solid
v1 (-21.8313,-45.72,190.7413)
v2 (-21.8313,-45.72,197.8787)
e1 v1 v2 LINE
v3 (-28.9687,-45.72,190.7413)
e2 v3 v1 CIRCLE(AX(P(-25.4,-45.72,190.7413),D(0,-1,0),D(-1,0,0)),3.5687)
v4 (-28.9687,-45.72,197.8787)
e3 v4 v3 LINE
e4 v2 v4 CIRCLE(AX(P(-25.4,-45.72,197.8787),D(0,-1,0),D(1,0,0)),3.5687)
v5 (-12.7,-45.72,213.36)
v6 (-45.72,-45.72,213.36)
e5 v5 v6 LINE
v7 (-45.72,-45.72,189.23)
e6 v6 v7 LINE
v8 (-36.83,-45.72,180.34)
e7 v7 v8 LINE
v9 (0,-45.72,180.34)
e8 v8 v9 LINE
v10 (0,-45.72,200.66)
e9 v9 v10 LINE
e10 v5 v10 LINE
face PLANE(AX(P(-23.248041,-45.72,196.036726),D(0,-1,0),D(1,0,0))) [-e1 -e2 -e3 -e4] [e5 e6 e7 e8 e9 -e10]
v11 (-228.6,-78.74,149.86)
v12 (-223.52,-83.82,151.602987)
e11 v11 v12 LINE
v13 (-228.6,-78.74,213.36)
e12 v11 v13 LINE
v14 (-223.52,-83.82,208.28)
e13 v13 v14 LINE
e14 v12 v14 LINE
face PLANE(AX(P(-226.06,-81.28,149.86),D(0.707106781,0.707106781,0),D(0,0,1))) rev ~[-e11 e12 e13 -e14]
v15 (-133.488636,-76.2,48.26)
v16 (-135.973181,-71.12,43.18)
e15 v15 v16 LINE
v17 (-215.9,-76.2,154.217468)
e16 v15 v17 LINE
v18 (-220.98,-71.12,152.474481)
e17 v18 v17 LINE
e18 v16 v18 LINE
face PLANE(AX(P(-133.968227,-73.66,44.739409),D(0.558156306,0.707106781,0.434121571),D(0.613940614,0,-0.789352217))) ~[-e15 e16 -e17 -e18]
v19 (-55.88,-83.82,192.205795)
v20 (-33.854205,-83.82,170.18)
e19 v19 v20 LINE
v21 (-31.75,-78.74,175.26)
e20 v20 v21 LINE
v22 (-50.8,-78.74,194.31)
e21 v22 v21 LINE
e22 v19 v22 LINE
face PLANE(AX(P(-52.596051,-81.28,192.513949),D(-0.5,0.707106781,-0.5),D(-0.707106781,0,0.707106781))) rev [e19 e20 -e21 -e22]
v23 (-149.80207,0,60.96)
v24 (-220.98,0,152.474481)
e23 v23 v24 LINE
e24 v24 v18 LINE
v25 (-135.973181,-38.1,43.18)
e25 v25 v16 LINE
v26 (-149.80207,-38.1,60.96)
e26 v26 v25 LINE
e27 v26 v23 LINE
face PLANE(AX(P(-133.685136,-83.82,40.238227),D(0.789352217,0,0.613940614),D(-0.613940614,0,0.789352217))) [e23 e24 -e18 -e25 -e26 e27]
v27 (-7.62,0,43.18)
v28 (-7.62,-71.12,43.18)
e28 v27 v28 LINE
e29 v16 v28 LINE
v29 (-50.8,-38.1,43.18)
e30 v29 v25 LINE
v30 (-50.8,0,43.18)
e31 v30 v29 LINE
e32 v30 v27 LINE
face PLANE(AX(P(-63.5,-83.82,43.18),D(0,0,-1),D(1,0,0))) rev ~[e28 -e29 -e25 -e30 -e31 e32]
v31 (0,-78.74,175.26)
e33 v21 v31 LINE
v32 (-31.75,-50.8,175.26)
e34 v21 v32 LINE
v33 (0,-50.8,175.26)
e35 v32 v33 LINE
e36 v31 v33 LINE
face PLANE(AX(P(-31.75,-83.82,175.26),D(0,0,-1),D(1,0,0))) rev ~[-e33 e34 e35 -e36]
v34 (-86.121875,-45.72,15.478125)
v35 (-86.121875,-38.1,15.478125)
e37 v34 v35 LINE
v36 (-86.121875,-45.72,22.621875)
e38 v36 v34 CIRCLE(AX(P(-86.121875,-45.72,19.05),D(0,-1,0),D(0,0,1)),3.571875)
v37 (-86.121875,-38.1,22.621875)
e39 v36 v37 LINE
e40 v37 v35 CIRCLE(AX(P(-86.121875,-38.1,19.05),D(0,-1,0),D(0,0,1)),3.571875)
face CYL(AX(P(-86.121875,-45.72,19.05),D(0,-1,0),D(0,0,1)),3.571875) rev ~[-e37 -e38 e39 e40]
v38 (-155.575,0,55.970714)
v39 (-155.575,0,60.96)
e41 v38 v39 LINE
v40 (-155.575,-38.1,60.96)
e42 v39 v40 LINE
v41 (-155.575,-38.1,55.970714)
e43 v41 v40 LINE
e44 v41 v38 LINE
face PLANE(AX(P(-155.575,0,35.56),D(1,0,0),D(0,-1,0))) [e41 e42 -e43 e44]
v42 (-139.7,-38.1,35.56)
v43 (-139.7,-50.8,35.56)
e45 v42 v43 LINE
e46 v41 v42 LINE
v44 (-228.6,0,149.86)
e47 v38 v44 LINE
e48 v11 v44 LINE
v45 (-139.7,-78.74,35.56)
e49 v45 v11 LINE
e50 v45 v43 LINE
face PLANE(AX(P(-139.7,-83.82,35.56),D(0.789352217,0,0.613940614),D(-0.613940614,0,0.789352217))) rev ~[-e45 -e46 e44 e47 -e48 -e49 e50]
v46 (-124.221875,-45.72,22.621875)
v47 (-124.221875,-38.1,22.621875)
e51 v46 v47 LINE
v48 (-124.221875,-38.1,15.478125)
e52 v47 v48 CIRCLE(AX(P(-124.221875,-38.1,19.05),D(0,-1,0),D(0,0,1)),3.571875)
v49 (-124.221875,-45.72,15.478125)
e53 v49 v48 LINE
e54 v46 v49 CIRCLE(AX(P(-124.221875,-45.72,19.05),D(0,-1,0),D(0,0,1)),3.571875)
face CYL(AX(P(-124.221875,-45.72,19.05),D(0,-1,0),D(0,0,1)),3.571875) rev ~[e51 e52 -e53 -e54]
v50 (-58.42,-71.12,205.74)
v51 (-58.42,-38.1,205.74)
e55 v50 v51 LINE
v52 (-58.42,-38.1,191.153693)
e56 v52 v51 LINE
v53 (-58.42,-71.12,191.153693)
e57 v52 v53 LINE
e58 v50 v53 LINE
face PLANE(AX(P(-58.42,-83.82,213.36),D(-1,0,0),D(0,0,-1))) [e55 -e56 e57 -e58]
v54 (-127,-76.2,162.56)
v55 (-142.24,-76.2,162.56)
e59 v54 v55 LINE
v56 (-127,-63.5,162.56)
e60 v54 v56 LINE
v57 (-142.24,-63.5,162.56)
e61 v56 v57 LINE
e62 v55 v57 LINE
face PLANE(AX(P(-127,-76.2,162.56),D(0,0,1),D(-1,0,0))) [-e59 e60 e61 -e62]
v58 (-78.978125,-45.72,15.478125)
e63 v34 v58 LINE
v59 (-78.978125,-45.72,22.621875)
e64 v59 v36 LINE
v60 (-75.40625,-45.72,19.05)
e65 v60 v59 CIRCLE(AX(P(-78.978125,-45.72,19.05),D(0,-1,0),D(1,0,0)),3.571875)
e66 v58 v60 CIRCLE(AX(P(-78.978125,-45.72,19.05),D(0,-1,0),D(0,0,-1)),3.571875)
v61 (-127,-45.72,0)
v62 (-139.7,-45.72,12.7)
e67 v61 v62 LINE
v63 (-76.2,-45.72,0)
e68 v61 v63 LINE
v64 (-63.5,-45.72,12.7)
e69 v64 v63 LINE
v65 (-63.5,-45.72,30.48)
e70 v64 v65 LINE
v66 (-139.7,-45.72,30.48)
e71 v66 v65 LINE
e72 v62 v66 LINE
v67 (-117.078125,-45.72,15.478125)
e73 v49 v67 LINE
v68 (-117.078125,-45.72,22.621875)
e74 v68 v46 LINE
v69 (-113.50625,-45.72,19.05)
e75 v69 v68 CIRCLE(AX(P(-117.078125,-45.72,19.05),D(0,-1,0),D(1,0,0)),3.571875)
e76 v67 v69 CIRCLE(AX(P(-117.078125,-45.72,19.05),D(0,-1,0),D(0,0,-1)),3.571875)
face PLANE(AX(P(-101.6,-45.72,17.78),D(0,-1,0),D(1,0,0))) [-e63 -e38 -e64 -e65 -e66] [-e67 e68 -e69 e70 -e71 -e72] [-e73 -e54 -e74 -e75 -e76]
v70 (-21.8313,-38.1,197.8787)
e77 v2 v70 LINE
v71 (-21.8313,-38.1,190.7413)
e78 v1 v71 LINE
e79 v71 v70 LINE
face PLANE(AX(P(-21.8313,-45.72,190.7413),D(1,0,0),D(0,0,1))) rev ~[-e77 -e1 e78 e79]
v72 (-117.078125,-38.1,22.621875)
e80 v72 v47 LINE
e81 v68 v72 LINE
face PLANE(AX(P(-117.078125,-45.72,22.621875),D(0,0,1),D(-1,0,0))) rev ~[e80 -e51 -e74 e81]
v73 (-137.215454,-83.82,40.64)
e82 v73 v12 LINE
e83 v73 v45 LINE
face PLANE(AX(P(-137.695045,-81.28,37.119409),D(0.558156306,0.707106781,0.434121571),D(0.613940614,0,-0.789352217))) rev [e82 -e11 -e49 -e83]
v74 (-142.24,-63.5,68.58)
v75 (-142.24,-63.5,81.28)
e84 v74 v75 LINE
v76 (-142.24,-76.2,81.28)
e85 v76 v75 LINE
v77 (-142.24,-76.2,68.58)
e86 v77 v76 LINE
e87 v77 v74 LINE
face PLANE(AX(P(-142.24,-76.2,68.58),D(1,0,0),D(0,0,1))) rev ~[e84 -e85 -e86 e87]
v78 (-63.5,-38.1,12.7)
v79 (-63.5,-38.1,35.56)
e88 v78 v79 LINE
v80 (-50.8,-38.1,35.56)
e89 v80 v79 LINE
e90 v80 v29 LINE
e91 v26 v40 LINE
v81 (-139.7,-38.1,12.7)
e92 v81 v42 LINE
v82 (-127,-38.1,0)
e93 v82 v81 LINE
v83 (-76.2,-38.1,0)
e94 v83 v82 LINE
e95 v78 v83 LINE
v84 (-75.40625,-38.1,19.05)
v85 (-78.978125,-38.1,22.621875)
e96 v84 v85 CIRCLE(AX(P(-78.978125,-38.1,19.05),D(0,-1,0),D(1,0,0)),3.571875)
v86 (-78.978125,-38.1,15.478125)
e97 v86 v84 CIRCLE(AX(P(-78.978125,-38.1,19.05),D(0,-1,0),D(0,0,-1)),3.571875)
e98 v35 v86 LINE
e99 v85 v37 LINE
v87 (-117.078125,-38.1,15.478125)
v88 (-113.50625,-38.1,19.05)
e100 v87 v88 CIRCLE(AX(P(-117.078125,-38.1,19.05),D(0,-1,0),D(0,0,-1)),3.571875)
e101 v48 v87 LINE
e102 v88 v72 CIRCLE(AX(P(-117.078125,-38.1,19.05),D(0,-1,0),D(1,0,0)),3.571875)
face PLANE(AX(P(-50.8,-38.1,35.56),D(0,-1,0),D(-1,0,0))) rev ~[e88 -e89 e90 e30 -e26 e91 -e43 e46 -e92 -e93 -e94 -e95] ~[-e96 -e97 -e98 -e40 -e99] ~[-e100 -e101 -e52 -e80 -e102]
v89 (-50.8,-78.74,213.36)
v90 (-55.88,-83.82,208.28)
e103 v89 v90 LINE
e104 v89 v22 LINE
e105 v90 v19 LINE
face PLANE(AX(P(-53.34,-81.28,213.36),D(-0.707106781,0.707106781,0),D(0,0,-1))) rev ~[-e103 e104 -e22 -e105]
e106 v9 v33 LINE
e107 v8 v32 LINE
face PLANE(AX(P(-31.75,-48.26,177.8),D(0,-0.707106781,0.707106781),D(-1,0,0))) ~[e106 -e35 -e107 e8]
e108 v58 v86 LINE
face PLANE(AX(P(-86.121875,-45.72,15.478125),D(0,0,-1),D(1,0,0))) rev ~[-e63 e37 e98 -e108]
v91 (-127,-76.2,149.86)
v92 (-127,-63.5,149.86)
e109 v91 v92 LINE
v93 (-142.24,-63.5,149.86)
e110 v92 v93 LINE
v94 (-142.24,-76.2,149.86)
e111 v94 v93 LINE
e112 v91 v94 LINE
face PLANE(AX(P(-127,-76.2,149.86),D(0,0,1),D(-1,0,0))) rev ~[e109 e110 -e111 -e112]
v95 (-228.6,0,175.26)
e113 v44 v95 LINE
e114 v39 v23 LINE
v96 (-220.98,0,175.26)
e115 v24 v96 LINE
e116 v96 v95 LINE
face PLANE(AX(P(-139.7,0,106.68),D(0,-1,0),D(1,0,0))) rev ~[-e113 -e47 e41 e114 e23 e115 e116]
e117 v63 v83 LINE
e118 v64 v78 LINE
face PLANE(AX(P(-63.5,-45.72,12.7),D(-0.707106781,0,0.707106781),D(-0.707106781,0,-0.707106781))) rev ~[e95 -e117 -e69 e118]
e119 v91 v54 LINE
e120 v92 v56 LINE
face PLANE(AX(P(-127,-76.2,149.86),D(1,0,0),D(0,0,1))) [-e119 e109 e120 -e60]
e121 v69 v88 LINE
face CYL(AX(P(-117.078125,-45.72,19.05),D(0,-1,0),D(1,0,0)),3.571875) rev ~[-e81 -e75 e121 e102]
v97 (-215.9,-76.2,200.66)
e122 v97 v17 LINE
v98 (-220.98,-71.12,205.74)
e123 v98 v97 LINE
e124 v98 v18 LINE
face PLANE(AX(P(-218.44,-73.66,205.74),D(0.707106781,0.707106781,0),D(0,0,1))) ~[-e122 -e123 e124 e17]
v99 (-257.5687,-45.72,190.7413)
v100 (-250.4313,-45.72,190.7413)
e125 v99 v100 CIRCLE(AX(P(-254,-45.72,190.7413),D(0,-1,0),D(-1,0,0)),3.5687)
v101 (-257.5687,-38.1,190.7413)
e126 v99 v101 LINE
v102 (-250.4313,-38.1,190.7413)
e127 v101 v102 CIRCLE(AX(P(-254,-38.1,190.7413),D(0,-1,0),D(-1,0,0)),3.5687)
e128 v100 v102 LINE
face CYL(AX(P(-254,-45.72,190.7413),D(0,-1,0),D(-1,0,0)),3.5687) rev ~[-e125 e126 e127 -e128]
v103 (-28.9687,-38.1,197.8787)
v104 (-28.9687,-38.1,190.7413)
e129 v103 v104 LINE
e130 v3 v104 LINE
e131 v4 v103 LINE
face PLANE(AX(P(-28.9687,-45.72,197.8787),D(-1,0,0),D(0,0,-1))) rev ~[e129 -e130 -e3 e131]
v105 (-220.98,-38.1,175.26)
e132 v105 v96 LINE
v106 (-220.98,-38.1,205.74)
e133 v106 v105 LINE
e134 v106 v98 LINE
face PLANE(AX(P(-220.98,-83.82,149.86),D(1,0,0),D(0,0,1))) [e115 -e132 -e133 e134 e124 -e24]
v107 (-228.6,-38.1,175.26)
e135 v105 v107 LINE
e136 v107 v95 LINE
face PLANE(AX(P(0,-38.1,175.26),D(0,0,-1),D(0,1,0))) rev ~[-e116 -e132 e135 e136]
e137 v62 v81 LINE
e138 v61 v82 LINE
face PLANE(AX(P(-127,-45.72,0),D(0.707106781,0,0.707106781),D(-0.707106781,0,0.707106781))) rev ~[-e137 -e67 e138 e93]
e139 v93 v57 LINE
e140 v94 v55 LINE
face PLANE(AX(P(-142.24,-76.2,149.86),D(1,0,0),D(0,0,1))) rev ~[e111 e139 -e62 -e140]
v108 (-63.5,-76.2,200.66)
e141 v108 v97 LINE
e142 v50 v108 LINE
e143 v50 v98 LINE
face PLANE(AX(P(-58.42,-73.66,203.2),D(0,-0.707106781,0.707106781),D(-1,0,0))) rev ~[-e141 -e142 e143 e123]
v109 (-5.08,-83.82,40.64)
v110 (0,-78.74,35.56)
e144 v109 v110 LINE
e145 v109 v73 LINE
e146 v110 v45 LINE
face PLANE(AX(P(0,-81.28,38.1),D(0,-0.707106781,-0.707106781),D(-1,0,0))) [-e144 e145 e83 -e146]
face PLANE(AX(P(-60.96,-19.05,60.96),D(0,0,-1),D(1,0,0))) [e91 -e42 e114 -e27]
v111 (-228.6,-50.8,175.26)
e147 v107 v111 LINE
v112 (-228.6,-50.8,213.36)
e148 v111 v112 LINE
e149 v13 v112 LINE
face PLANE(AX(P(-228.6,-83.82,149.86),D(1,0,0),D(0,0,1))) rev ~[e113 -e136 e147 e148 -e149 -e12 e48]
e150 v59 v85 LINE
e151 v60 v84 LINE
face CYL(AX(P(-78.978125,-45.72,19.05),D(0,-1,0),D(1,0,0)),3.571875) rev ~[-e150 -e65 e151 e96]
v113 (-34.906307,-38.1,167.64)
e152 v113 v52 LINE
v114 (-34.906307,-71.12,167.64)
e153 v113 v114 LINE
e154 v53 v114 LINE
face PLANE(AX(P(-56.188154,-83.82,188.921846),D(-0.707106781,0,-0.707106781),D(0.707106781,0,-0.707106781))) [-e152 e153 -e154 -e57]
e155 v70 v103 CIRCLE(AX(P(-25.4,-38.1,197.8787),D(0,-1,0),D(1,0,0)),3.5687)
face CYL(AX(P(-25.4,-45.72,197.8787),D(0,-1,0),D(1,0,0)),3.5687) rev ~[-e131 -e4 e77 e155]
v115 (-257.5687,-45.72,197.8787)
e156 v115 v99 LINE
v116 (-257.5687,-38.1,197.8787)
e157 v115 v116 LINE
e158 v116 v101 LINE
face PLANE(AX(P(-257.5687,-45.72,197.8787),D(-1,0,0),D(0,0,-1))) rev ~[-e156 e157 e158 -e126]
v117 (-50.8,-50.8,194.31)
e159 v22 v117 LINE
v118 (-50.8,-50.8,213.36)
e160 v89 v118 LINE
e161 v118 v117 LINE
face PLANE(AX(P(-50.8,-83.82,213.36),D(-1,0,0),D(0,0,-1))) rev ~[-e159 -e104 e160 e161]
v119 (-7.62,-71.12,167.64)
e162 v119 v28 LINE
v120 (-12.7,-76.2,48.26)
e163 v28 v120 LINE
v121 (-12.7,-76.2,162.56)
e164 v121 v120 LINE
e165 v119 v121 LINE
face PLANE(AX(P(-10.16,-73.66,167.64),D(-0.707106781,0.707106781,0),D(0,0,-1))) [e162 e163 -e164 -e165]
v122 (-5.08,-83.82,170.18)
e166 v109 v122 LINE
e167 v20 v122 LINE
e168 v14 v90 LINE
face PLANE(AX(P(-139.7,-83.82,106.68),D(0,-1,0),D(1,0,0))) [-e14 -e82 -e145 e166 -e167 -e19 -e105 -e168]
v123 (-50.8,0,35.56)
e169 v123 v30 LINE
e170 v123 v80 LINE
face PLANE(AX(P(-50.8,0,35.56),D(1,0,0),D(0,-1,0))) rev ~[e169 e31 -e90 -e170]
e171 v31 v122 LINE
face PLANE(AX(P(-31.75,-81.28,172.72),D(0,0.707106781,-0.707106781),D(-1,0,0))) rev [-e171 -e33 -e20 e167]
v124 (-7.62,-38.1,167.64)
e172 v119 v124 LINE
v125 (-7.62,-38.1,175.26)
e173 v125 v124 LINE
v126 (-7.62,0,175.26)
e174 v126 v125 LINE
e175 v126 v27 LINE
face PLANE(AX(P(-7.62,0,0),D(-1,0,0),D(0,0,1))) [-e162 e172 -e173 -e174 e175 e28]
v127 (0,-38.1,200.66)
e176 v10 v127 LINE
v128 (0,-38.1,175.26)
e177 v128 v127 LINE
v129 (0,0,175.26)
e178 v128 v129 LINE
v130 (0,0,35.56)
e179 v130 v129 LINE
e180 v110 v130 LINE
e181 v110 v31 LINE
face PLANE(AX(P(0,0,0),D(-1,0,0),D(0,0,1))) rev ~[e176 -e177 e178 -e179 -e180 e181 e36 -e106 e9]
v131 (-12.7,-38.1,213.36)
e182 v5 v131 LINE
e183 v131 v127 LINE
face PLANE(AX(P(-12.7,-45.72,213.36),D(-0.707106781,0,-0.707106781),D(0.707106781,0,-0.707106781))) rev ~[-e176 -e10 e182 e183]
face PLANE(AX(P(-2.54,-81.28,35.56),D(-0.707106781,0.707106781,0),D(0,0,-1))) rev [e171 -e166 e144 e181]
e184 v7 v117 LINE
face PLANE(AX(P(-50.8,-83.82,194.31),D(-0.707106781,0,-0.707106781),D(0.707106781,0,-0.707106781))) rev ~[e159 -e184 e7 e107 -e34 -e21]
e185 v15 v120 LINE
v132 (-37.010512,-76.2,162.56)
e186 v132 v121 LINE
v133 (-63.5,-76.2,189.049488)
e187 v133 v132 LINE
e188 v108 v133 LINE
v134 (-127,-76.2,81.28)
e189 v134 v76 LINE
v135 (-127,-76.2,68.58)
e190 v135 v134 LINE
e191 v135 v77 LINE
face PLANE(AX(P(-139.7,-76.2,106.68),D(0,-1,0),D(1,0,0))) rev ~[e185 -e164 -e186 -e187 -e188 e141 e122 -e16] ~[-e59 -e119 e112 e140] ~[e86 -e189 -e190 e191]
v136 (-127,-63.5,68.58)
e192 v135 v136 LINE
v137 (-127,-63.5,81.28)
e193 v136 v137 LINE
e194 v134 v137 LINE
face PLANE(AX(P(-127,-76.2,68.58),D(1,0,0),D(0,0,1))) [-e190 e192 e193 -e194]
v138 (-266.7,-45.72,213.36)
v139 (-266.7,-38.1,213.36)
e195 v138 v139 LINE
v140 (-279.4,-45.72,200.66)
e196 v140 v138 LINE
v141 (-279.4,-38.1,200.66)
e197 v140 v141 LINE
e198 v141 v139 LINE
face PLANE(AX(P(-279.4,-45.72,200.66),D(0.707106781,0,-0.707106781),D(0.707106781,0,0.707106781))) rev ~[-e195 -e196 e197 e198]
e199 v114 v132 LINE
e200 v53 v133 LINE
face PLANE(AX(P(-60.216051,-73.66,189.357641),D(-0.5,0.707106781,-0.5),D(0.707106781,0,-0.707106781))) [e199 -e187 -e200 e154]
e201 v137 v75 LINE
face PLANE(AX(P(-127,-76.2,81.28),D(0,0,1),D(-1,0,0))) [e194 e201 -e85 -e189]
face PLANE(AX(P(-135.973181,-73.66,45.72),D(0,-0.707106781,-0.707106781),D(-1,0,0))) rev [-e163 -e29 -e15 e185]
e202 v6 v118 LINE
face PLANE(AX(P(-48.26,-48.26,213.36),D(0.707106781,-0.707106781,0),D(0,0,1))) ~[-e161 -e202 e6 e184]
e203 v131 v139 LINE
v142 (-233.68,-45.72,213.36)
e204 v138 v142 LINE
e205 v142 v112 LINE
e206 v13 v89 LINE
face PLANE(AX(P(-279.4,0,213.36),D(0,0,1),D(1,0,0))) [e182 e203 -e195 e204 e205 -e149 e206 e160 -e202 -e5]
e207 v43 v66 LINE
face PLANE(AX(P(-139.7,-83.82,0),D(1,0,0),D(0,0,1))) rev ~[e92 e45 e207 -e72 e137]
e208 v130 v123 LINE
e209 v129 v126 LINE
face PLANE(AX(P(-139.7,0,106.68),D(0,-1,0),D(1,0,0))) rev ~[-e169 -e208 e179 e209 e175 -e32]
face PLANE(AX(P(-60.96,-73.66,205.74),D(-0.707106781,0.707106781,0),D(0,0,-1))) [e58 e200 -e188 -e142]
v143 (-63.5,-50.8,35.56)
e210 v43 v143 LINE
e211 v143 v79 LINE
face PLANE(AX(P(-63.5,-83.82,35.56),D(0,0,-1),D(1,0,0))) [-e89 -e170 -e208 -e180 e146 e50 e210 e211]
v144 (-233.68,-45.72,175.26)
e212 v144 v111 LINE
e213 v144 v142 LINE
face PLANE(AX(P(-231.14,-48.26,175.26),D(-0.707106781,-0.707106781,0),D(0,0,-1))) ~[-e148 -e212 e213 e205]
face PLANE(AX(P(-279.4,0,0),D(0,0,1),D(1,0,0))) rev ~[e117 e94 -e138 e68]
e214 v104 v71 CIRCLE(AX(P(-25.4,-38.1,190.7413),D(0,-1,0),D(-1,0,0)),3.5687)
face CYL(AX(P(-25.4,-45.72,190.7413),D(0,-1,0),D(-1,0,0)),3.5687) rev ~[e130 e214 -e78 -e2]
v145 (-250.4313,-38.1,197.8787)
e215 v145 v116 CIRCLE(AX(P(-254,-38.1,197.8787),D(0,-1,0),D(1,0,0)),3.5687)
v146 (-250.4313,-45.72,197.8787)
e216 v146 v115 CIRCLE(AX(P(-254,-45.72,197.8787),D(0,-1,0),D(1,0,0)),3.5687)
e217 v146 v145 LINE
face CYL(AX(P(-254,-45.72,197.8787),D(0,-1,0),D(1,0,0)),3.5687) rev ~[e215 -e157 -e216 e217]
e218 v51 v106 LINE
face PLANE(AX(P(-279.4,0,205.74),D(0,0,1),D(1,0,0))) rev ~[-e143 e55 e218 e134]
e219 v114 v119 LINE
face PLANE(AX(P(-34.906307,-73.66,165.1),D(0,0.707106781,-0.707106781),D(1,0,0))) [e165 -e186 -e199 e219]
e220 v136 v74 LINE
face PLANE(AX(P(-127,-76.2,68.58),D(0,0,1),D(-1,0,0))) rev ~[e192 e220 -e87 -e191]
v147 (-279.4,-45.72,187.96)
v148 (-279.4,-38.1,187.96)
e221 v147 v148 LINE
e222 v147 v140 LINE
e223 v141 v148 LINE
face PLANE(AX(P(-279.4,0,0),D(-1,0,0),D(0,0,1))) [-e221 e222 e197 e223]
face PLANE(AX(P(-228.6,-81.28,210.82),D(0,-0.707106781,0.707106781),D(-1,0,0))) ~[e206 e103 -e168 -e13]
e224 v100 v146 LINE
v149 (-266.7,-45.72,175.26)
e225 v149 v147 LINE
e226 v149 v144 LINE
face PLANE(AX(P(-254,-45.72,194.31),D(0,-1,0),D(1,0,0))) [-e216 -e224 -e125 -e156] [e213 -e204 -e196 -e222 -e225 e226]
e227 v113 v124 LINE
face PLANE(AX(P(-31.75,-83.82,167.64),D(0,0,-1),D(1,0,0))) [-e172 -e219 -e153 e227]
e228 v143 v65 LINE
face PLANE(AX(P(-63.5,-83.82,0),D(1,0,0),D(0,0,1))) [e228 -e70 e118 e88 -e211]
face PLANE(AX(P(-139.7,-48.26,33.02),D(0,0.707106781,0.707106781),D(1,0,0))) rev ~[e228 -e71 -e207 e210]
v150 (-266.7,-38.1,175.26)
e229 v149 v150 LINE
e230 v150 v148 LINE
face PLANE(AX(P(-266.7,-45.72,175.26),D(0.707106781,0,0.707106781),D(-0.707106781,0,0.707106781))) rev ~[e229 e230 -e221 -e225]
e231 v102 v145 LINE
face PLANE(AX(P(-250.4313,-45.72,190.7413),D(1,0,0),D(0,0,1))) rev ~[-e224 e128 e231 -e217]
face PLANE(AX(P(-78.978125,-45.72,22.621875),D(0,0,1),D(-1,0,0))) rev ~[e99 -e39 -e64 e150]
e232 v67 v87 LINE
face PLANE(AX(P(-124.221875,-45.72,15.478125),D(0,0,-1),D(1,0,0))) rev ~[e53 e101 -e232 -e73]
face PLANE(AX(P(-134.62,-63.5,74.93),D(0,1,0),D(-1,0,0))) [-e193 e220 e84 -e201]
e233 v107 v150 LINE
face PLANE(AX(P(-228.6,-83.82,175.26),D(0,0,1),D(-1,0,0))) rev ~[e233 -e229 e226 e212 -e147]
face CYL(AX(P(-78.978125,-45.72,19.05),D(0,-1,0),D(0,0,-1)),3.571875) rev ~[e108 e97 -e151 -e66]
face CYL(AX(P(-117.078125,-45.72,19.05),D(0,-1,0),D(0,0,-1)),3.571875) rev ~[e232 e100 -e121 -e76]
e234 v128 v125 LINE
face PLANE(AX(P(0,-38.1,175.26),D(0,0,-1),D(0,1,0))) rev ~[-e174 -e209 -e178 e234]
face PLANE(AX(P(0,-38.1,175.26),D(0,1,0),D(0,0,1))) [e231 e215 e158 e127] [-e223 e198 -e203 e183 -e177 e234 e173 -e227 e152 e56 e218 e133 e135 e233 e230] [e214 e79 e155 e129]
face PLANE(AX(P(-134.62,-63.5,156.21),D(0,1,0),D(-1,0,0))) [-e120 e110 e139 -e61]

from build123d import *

# Parameters (mm, degrees)
F0_W      = 279.4
F0_H      = 213.36
F1_DEPTH  = 83.82
F2_W      = 76.2
F2_H      = 35.56
F2_W_2    = 50.8
F2_H_2    = 38.1
F3_DEPTH  = 38.1
F2_W_3    = 63.5
F4_DEPTH  = 83.82
F5_T      = -7.62
F6_W      = 38.1
F6_H      = 38.1
F6_H_2    = 35.56
F7_DEPTH  = 341.884
F9_DEPTH  = 7.62
F10_SIZE  = 5.08
F11_W     = 84.455
F11_H     = 38.1
F12_DEPTH = 25.4
F13_W     = 15.24
F13_H     = 12.7
F14_DEPTH = 12.7


# Not quite as in the source:
# - a feature names something its author has since deleted; it is built from what else it names


with BuildPart() as f1:
    # F0 (on Front) → F1 (new body)
    with BuildSketch(Plane.XZ):
        with Locations((-139.7, 106.68)):
            Rectangle(F0_W, F0_H)
    extrude(amount=F1_DEPTH)

    # F2 (on face) → F3 (cut)
    with BuildSketch(Plane.XZ.offset(83.82)):
        Polygon((0, 213.36), (-50.8, 213.36), (-50.8, 194.31), (-31.75, 175.26), (0, 175.26), align=None)
        with Locations((-101.6, 17.78)):
            Rectangle(F2_W, F2_H)
        with Locations((-254, 194.31)):
            Rectangle(F2_W_2, F2_H_2)
    extrude(amount=-F3_DEPTH, mode=Mode.SUBTRACT)

    # F2 (on face) → F4 (cut)
    with BuildSketch(Plane.XZ.offset(83.82)):
        Polygon((-228.6, 149.86), (-228.6, 175.26), (-279.4, 175.26), (-279.4, 0), (-139.7, 0), (-139.7, 35.56), align=None)
        with Locations((-31.75, 17.78)):
            Rectangle(F2_W_3, F2_H)
    extrude(amount=-F4_DEPTH, mode=Mode.SUBTRACT)

    # F5
    f5_openings = [f1.faces().sort_by_distance(p)[0] for p in [
        (-109.470638, 0, 127.051961),
    ]]
    offset(amount=F5_T, openings=f5_openings, kind=Kind.INTERSECTION)

    # F6 (on face) → F7 (cut)
    with BuildSketch(Plane.YZ):
        with Locations((-19.05, 194.31)):
            Rectangle(F6_W, F6_H)
        with Locations((-19.05, 17.78)):
            Rectangle(F6_W, F6_H_2)
    extrude(amount=-F7_DEPTH, mode=Mode.SUBTRACT)

    # F8 (on face) → F9 (cut)
    with BuildSketch(Plane.XZ.offset(45.72)):
        with BuildLine():
            ThreePointArc((-22.3094151415, 192.52565), (-21.9529005037, 193.3863524737), (-21.8313, 194.31))
            ThreePointArc((-21.8313, 194.31), (-21.9529005037, 195.2336475263), (-22.3094151415, 196.09435))
            ThreePointArc((-22.3094151415, 196.09435), (-23.61565, 194.7881151415), (-25.4, 194.31))
            ThreePointArc((-25.4, 194.31), (-23.61565, 193.8318848585), (-22.3094151415, 192.52565))
        make_face()
        with BuildLine():
            ThreePointArc((-25.4, 194.31), (-27.18435, 194.7881151415), (-28.4905848585, 196.09435))
            ThreePointArc((-28.4905848585, 196.09435), (-28.8470994963, 195.2336475263), (-28.9687, 194.31))
            ThreePointArc((-28.9687, 194.31), (-28.8470994963, 193.3863524737), (-28.4905848585, 192.52565))
            ThreePointArc((-28.4905848585, 192.52565), (-27.18435, 193.8318848585), (-25.4, 194.31))
        make_face()
        Polygon((0, 200.66), (0, 213.36), (-12.7, 213.36), align=None)
        with BuildLine():
            ThreePointArc((-250.9094151415, 192.52565), (-250.5529005037, 193.3863524737), (-250.4313, 194.31))
            ThreePointArc((-250.4313, 194.31), (-250.5529005037, 195.2336475263), (-250.9094151415, 196.09435))
            ThreePointArc((-250.9094151415, 196.09435), (-252.21565, 194.7881151415), (-254, 194.31))
            ThreePointArc((-254, 194.31), (-252.21565, 193.8318848585), (-250.9094151415, 192.52565))
        make_face()
        with BuildLine():
            ThreePointArc((-254, 194.31), (-255.78435, 194.7881151415), (-257.0905848585, 196.09435))
            ThreePointArc((-257.0905848585, 196.09435), (-257.4470994963, 195.2336475263), (-257.5687, 194.31))
            ThreePointArc((-257.5687, 194.31), (-257.4470994963, 193.3863524737), (-257.0905848585, 192.52565))
            ThreePointArc((-257.0905848585, 192.52565), (-255.78435, 193.8318848585), (-254, 194.31))
        make_face()
        Polygon((-279.4, 200.66), (-266.7, 213.36), (-279.4, 213.36), align=None)
        Polygon((-279.4, 175.26), (-266.7, 175.26), (-279.4, 187.96), align=None)
        Polygon((-127, 0), (-139.7, 12.7), (-139.7, 0), align=None)
        Polygon((-63.5, 12.7), (-76.2, 0), (-63.5, 0), align=None)
        with BuildLine():
            ThreePointArc((-82.55, 19.05), (-82.0714594891, 20.8359375), (-80.7640625, 22.1433344891))
            ThreePointArc((-80.7640625, 22.1433344891), (-81.6255307233, 22.5001663108), (-82.55, 22.621875))
            ThreePointArc((-82.55, 22.621875), (-83.4744692767, 22.5001663108), (-84.3359375, 22.1433344891))
            ThreePointArc((-84.3359375, 22.1433344891), (-83.0285405109, 20.8359375), (-82.55, 19.05))
        make_face()
        with BuildLine():
            ThreePointArc((-82.55, 15.478125), (-81.6255307233, 15.5998336892), (-80.7640625, 15.9566655109))
            ThreePointArc((-80.7640625, 15.9566655109), (-82.0714594891, 17.2640625), (-82.55, 19.05))
            ThreePointArc((-82.55, 19.05), (-83.0285405109, 17.2640625), (-84.3359375, 15.9566655109))
            ThreePointArc((-84.3359375, 15.9566655109), (-83.4744692767, 15.5998336892), (-82.55, 15.478125))
        make_face()
        with BuildLine():
            ThreePointArc((-120.65, 19.05), (-120.1714594891, 20.8359375), (-118.8640625, 22.1433344891))
            ThreePointArc((-118.8640625, 22.1433344891), (-119.7255307233, 22.5001663108), (-120.65, 22.621875))
            ThreePointArc((-120.65, 22.621875), (-121.5744692767, 22.5001663108), (-122.4359375, 22.1433344891))
            ThreePointArc((-122.4359375, 22.1433344891), (-121.1285405109, 20.8359375), (-120.65, 19.05))
        make_face()
        with BuildLine():
            ThreePointArc((-120.65, 15.478125), (-119.7255307233, 15.5998336892), (-118.8640625, 15.9566655109))
            ThreePointArc((-118.8640625, 15.9566655109), (-120.1714594891, 17.2640625), (-120.65, 19.05))
            ThreePointArc((-120.65, 19.05), (-121.1285405109, 17.2640625), (-122.4359375, 15.9566655109))
            ThreePointArc((-122.4359375, 15.9566655109), (-121.5744692767, 15.5998336892), (-120.65, 15.478125))
        make_face()
        with BuildLine():
            ThreePointArc((-28.4905848585, 196.09435), (-25.4, 197.8787), (-22.3094151415, 196.09435))
            ThreePointArc((-22.3094151415, 196.09435), (-21.9529005037, 196.9550524737), (-21.8313, 197.8787))
            ThreePointArc((-21.8313, 197.8787), (-25.4, 201.4474), (-28.9687, 197.8787))
            ThreePointArc((-28.9687, 197.8787), (-28.8470994963, 196.9550524737), (-28.4905848585, 196.09435))
        make_face()
        with BuildLine():
            ThreePointArc((-25.4, 194.31), (-23.61565, 194.7881151415), (-22.3094151415, 196.09435))
            ThreePointArc((-22.3094151415, 196.09435), (-25.4, 197.8787), (-28.4905848585, 196.09435))
            ThreePointArc((-28.4905848585, 196.09435), (-27.18435, 194.7881151415), (-25.4, 194.31))
        make_face()
        with BuildLine():
            ThreePointArc((-28.4905848585, 192.52565), (-25.4, 190.7413), (-22.3094151415, 192.52565))
            ThreePointArc((-22.3094151415, 192.52565), (-23.61565, 193.8318848585), (-25.4, 194.31))
            ThreePointArc((-25.4, 194.31), (-27.18435, 193.8318848585), (-28.4905848585, 192.52565))
        make_face()
        with BuildLine():
            ThreePointArc((-21.8313, 190.7413), (-21.9529005037, 191.6649475263), (-22.3094151415, 192.52565))
            ThreePointArc((-22.3094151415, 192.52565), (-25.4, 190.7413), (-28.4905848585, 192.52565))
            ThreePointArc((-28.4905848585, 192.52565), (-28.8470994963, 191.6649475263), (-28.9687, 190.7413))
            ThreePointArc((-28.9687, 190.7413), (-25.4, 187.1726), (-21.8313, 190.7413))
        make_face()
        with BuildLine():
            ThreePointArc((-28.9687, 194.31), (-28.8470994963, 195.2336475263), (-28.4905848585, 196.09435))
            ThreePointArc((-28.4905848585, 196.09435), (-28.8470994963, 196.9550524737), (-28.9687, 197.8787))
            Line((-28.9687, 197.8787), (-28.9687, 194.31))
        make_face()
        with BuildLine():
            ThreePointArc((-22.3094151415, 196.09435), (-21.9529005037, 195.2336475263), (-21.8313, 194.31))
            Line((-21.8313, 194.31), (-21.8313, 197.8787))
            ThreePointArc((-21.8313, 197.8787), (-21.9529005037, 196.9550524737), (-22.3094151415, 196.09435))
        make_face()
        with BuildLine():
            Line((-21.8313, 190.7413), (-21.8313, 194.31))
            ThreePointArc((-21.8313, 194.31), (-21.9529005037, 193.3863524737), (-22.3094151415, 192.52565))
            ThreePointArc((-22.3094151415, 192.52565), (-21.9529005037, 191.6649475263), (-21.8313, 190.7413))
        make_face()
        with BuildLine():
            ThreePointArc((-28.9687, 190.7413), (-28.8470994963, 191.6649475263), (-28.4905848585, 192.52565))
            ThreePointArc((-28.4905848585, 192.52565), (-28.8470994963, 193.3863524737), (-28.9687, 194.31))
            Line((-28.9687, 194.31), (-28.9687, 190.7413))
        make_face()
        with BuildLine():
            ThreePointArc((-122.4359375, 15.9566655109), (-121.1285405109, 17.2640625), (-120.65, 19.05))
            ThreePointArc((-120.65, 19.05), (-121.1285405109, 20.8359375), (-122.4359375, 22.1433344891))
            ThreePointArc((-122.4359375, 22.1433344891), (-124.221875, 19.05), (-122.4359375, 15.9566655109))
        make_face()
        with BuildLine():
            ThreePointArc((-118.8640625, 15.9566655109), (-117.5566655109, 17.2640625), (-117.078125, 19.05))
            ThreePointArc((-117.078125, 19.05), (-117.5566655109, 20.8359375), (-118.8640625, 22.1433344891))
            ThreePointArc((-118.8640625, 22.1433344891), (-120.1714594891, 20.8359375), (-120.65, 19.05))
            ThreePointArc((-120.65, 19.05), (-120.1714594891, 17.2640625), (-118.8640625, 15.9566655109))
        make_face()
        with BuildLine():
            ThreePointArc((-118.8640625, 22.1433344891), (-117.5566655109, 20.8359375), (-117.078125, 19.05))
            ThreePointArc((-117.078125, 19.05), (-117.5566655109, 17.2640625), (-118.8640625, 15.9566655109))
            ThreePointArc((-118.8640625, 15.9566655109), (-118.0025942767, 15.5998336892), (-117.078125, 15.478125))
            ThreePointArc((-117.078125, 15.478125), (-114.5524279659, 16.5243029659), (-113.50625, 19.05))
            ThreePointArc((-113.50625, 19.05), (-114.5524279659, 21.5756970341), (-117.078125, 22.621875))
            ThreePointArc((-117.078125, 22.621875), (-118.0025942767, 22.5001663108), (-118.8640625, 22.1433344891))
        make_face()
        with BuildLine():
            ThreePointArc((-122.4359375, 15.9566655109), (-124.221875, 19.05), (-122.4359375, 22.1433344891))
            ThreePointArc((-122.4359375, 22.1433344891), (-123.2974057233, 22.5001663108), (-124.221875, 22.621875))
            ThreePointArc((-124.221875, 22.621875), (-127.79375, 19.05), (-124.221875, 15.478125))
            ThreePointArc((-124.221875, 15.478125), (-123.2974057233, 15.5998336892), (-122.4359375, 15.9566655109))
        make_face()
        with BuildLine():
            ThreePointArc((-120.65, 22.621875), (-119.7255307233, 22.5001663108), (-118.8640625, 22.1433344891))
            ThreePointArc((-118.8640625, 22.1433344891), (-118.0025942767, 22.5001663108), (-117.078125, 22.621875))
            Line((-117.078125, 22.621875), (-120.65, 22.621875))
        make_face()
        with BuildLine():
            ThreePointArc((-122.4359375, 22.1433344891), (-121.5744692767, 22.5001663108), (-120.65, 22.621875))
            Line((-120.65, 22.621875), (-124.221875, 22.621875))
            ThreePointArc((-124.221875, 22.621875), (-123.2974057233, 22.5001663108), (-122.4359375, 22.1433344891))
        make_face()
        with BuildLine():
            ThreePointArc((-117.078125, 15.478125), (-118.0025942767, 15.5998336892), (-118.8640625, 15.9566655109))
            ThreePointArc((-118.8640625, 15.9566655109), (-119.7255307233, 15.5998336892), (-120.65, 15.478125))
            Line((-120.65, 15.478125), (-117.078125, 15.478125))
        make_face()
        with BuildLine():
            Line((-124.221875, 15.478125), (-120.65, 15.478125))
            ThreePointArc((-120.65, 15.478125), (-121.5744692767, 15.5998336892), (-122.4359375, 15.9566655109))
            ThreePointArc((-122.4359375, 15.9566655109), (-123.2974057233, 15.5998336892), (-124.221875, 15.478125))
        make_face()
        with BuildLine():
            ThreePointArc((-82.55, 22.621875), (-81.6255307233, 22.5001663108), (-80.7640625, 22.1433344891))
            ThreePointArc((-80.7640625, 22.1433344891), (-79.9025942767, 22.5001663108), (-78.978125, 22.621875))
            Line((-78.978125, 22.621875), (-82.55, 22.621875))
        make_face()
        with BuildLine():
            ThreePointArc((-84.3359375, 22.1433344891), (-83.4744692767, 22.5001663108), (-82.55, 22.621875))
            Line((-82.55, 22.621875), (-86.121875, 22.621875))
            ThreePointArc((-86.121875, 22.621875), (-85.1974057233, 22.5001663108), (-84.3359375, 22.1433344891))
        make_face()
        with BuildLine():
            ThreePointArc((-84.3359375, 15.9566655109), (-86.121875, 19.05), (-84.3359375, 22.1433344891))
            ThreePointArc((-84.3359375, 22.1433344891), (-85.1974057233, 22.5001663108), (-86.121875, 22.621875))
            ThreePointArc((-86.121875, 22.621875), (-89.69375, 19.05), (-86.121875, 15.478125))
            ThreePointArc((-86.121875, 15.478125), (-85.1974057233, 15.5998336892), (-84.3359375, 15.9566655109))
        make_face()
        with BuildLine():
            ThreePointArc((-84.3359375, 15.9566655109), (-83.0285405109, 17.2640625), (-82.55, 19.05))
            ThreePointArc((-82.55, 19.05), (-83.0285405109, 20.8359375), (-84.3359375, 22.1433344891))
            ThreePointArc((-84.3359375, 22.1433344891), (-86.121875, 19.05), (-84.3359375, 15.9566655109))
        make_face()
        with BuildLine():
            ThreePointArc((-80.7640625, 15.9566655109), (-79.4566655109, 17.2640625), (-78.978125, 19.05))
            ThreePointArc((-78.978125, 19.05), (-79.4566655109, 20.8359375), (-80.7640625, 22.1433344891))
            ThreePointArc((-80.7640625, 22.1433344891), (-82.0714594891, 20.8359375), (-82.55, 19.05))
            ThreePointArc((-82.55, 19.05), (-82.0714594891, 17.2640625), (-80.7640625, 15.9566655109))
        make_face()
        with BuildLine():
            ThreePointArc((-80.7640625, 22.1433344891), (-79.4566655109, 20.8359375), (-78.978125, 19.05))
            ThreePointArc((-78.978125, 19.05), (-79.4566655109, 17.2640625), (-80.7640625, 15.9566655109))
            ThreePointArc((-80.7640625, 15.9566655109), (-79.9025942767, 15.5998336892), (-78.978125, 15.478125))
            ThreePointArc((-78.978125, 15.478125), (-76.4524279659, 16.5243029659), (-75.40625, 19.05))
            ThreePointArc((-75.40625, 19.05), (-76.4524279659, 21.5756970341), (-78.978125, 22.621875))
            ThreePointArc((-78.978125, 22.621875), (-79.9025942767, 22.5001663108), (-80.7640625, 22.1433344891))
        make_face()
        with BuildLine():
            ThreePointArc((-78.978125, 15.478125), (-79.9025942767, 15.5998336892), (-80.7640625, 15.9566655109))
            ThreePointArc((-80.7640625, 15.9566655109), (-81.6255307233, 15.5998336892), (-82.55, 15.478125))
            Line((-82.55, 15.478125), (-78.978125, 15.478125))
        make_face()
        with BuildLine():
            Line((-86.121875, 15.478125), (-82.55, 15.478125))
            ThreePointArc((-82.55, 15.478125), (-83.4744692767, 15.5998336892), (-84.3359375, 15.9566655109))
            ThreePointArc((-84.3359375, 15.9566655109), (-85.1974057233, 15.5998336892), (-86.121875, 15.478125))
        make_face()
        with BuildLine():
            ThreePointArc((-254, 194.31), (-252.21565, 194.7881151415), (-250.9094151415, 196.09435))
            ThreePointArc((-250.9094151415, 196.09435), (-254, 197.8787), (-257.0905848585, 196.09435))
            ThreePointArc((-257.0905848585, 196.09435), (-255.78435, 194.7881151415), (-254, 194.31))
        make_face()
        with BuildLine():
            ThreePointArc((-257.0905848585, 196.09435), (-254, 197.8787), (-250.9094151415, 196.09435))
            ThreePointArc((-250.9094151415, 196.09435), (-250.5529005037, 196.9550524737), (-250.4313, 197.8787))
            ThreePointArc((-250.4313, 197.8787), (-254, 201.4474), (-257.5687, 197.8787))
            ThreePointArc((-257.5687, 197.8787), (-257.4470994963, 196.9550524737), (-257.0905848585, 196.09435))
        make_face()
        with BuildLine():
            ThreePointArc((-257.0905848585, 192.52565), (-254, 190.7413), (-250.9094151415, 192.52565))
            ThreePointArc((-250.9094151415, 192.52565), (-252.21565, 193.8318848585), (-254, 194.31))
            ThreePointArc((-254, 194.31), (-255.78435, 193.8318848585), (-257.0905848585, 192.52565))
        make_face()
        with BuildLine():
            ThreePointArc((-250.4313, 190.7413), (-250.5529005037, 191.6649475263), (-250.9094151415, 192.52565))
            ThreePointArc((-250.9094151415, 192.52565), (-254, 190.7413), (-257.0905848585, 192.52565))
            ThreePointArc((-257.0905848585, 192.52565), (-257.4470994963, 191.6649475263), (-257.5687, 190.7413))
            ThreePointArc((-257.5687, 190.7413), (-254, 187.1726), (-250.4313, 190.7413))
        make_face()
        with BuildLine():
            Line((-250.4313, 190.7413), (-250.4313, 194.31))
            ThreePointArc((-250.4313, 194.31), (-250.5529005037, 193.3863524737), (-250.9094151415, 192.52565))
            ThreePointArc((-250.9094151415, 192.52565), (-250.5529005037, 191.6649475263), (-250.4313, 190.7413))
        make_face()
        with BuildLine():
            ThreePointArc((-250.9094151415, 196.09435), (-250.5529005037, 195.2336475263), (-250.4313, 194.31))
            Line((-250.4313, 194.31), (-250.4313, 197.8787))
            ThreePointArc((-250.4313, 197.8787), (-250.5529005037, 196.9550524737), (-250.9094151415, 196.09435))
        make_face()
        with BuildLine():
            ThreePointArc((-257.5687, 194.31), (-257.4470994963, 195.2336475263), (-257.0905848585, 196.09435))
            ThreePointArc((-257.0905848585, 196.09435), (-257.4470994963, 196.9550524737), (-257.5687, 197.8787))
            Line((-257.5687, 197.8787), (-257.5687, 194.31))
        make_face()
        with BuildLine():
            ThreePointArc((-257.5687, 190.7413), (-257.4470994963, 191.6649475263), (-257.0905848585, 192.52565))
            ThreePointArc((-257.0905848585, 192.52565), (-257.4470994963, 193.3863524737), (-257.5687, 194.31))
            Line((-257.5687, 194.31), (-257.5687, 190.7413))
        make_face()
    extrude(amount=-F9_DEPTH, mode=Mode.SUBTRACT)

    # F10
    f10_edges = [f1.edges().sort_by_distance(p)[0] for p in [
        (-50.8, -45.72, 203.835),
        (-15.875, -45.72, 175.26),
        (-228.6, -45.72, 194.31),
        (-101.6, -45.72, 35.56),
        (-220.98, -76.2, 179.107241),
        (-139.7, -76.2, 205.74),
        (-58.42, -76.2, 198.446846),
        (-46.663154, -76.2, 179.396846),
        (-21.263154, -76.2, 167.64),
        (-7.62, -76.2, 105.41),
        (-71.796591, -76.2, 43.18),
        (-178.476591, -76.2, 97.827241),
        (-139.7, -83.82, 213.36),
        (-228.6, -83.82, 181.61),
        (-184.15, -83.82, 92.71),
        (-69.85, -83.82, 35.56),
        (0, -83.82, 105.41),
        (-15.875, -83.82, 175.26),
        (-41.275, -83.82, 184.785),
        (-50.8, -83.82, 203.835),
    ]]
    chamfer(f10_edges, length=F10_SIZE)

    # F11 (on face) → F12 (cut)
    with BuildSketch(Plane(origin=(0, 0, 35.56), x_dir=(1, 0, 0), z_dir=(0, 0, -1))):
        Polygon((-71.12, 38.1), (-71.12, 0), (-50.8, 0), (-50.8, 38.1), (-63.5, 38.1), align=None)
        with Locations((-113.3475, 19.05)):
            Rectangle(F11_W, F11_H)
    extrude(amount=-F12_DEPTH, mode=Mode.SUBTRACT)

    # F13 (on face) → F14 (join)
    with BuildSketch(Plane(origin=(0, -76.2, 0), x_dir=(-1, 0, 0), z_dir=(0, 1, 0))):
        with Locations((134.62, 156.21)):
            Rectangle(F13_W, F13_H)
        with Locations((134.62, 74.93)):
            Rectangle(F13_W, F13_H)
    extrude(amount=F14_DEPTH)


solid = f1.part
